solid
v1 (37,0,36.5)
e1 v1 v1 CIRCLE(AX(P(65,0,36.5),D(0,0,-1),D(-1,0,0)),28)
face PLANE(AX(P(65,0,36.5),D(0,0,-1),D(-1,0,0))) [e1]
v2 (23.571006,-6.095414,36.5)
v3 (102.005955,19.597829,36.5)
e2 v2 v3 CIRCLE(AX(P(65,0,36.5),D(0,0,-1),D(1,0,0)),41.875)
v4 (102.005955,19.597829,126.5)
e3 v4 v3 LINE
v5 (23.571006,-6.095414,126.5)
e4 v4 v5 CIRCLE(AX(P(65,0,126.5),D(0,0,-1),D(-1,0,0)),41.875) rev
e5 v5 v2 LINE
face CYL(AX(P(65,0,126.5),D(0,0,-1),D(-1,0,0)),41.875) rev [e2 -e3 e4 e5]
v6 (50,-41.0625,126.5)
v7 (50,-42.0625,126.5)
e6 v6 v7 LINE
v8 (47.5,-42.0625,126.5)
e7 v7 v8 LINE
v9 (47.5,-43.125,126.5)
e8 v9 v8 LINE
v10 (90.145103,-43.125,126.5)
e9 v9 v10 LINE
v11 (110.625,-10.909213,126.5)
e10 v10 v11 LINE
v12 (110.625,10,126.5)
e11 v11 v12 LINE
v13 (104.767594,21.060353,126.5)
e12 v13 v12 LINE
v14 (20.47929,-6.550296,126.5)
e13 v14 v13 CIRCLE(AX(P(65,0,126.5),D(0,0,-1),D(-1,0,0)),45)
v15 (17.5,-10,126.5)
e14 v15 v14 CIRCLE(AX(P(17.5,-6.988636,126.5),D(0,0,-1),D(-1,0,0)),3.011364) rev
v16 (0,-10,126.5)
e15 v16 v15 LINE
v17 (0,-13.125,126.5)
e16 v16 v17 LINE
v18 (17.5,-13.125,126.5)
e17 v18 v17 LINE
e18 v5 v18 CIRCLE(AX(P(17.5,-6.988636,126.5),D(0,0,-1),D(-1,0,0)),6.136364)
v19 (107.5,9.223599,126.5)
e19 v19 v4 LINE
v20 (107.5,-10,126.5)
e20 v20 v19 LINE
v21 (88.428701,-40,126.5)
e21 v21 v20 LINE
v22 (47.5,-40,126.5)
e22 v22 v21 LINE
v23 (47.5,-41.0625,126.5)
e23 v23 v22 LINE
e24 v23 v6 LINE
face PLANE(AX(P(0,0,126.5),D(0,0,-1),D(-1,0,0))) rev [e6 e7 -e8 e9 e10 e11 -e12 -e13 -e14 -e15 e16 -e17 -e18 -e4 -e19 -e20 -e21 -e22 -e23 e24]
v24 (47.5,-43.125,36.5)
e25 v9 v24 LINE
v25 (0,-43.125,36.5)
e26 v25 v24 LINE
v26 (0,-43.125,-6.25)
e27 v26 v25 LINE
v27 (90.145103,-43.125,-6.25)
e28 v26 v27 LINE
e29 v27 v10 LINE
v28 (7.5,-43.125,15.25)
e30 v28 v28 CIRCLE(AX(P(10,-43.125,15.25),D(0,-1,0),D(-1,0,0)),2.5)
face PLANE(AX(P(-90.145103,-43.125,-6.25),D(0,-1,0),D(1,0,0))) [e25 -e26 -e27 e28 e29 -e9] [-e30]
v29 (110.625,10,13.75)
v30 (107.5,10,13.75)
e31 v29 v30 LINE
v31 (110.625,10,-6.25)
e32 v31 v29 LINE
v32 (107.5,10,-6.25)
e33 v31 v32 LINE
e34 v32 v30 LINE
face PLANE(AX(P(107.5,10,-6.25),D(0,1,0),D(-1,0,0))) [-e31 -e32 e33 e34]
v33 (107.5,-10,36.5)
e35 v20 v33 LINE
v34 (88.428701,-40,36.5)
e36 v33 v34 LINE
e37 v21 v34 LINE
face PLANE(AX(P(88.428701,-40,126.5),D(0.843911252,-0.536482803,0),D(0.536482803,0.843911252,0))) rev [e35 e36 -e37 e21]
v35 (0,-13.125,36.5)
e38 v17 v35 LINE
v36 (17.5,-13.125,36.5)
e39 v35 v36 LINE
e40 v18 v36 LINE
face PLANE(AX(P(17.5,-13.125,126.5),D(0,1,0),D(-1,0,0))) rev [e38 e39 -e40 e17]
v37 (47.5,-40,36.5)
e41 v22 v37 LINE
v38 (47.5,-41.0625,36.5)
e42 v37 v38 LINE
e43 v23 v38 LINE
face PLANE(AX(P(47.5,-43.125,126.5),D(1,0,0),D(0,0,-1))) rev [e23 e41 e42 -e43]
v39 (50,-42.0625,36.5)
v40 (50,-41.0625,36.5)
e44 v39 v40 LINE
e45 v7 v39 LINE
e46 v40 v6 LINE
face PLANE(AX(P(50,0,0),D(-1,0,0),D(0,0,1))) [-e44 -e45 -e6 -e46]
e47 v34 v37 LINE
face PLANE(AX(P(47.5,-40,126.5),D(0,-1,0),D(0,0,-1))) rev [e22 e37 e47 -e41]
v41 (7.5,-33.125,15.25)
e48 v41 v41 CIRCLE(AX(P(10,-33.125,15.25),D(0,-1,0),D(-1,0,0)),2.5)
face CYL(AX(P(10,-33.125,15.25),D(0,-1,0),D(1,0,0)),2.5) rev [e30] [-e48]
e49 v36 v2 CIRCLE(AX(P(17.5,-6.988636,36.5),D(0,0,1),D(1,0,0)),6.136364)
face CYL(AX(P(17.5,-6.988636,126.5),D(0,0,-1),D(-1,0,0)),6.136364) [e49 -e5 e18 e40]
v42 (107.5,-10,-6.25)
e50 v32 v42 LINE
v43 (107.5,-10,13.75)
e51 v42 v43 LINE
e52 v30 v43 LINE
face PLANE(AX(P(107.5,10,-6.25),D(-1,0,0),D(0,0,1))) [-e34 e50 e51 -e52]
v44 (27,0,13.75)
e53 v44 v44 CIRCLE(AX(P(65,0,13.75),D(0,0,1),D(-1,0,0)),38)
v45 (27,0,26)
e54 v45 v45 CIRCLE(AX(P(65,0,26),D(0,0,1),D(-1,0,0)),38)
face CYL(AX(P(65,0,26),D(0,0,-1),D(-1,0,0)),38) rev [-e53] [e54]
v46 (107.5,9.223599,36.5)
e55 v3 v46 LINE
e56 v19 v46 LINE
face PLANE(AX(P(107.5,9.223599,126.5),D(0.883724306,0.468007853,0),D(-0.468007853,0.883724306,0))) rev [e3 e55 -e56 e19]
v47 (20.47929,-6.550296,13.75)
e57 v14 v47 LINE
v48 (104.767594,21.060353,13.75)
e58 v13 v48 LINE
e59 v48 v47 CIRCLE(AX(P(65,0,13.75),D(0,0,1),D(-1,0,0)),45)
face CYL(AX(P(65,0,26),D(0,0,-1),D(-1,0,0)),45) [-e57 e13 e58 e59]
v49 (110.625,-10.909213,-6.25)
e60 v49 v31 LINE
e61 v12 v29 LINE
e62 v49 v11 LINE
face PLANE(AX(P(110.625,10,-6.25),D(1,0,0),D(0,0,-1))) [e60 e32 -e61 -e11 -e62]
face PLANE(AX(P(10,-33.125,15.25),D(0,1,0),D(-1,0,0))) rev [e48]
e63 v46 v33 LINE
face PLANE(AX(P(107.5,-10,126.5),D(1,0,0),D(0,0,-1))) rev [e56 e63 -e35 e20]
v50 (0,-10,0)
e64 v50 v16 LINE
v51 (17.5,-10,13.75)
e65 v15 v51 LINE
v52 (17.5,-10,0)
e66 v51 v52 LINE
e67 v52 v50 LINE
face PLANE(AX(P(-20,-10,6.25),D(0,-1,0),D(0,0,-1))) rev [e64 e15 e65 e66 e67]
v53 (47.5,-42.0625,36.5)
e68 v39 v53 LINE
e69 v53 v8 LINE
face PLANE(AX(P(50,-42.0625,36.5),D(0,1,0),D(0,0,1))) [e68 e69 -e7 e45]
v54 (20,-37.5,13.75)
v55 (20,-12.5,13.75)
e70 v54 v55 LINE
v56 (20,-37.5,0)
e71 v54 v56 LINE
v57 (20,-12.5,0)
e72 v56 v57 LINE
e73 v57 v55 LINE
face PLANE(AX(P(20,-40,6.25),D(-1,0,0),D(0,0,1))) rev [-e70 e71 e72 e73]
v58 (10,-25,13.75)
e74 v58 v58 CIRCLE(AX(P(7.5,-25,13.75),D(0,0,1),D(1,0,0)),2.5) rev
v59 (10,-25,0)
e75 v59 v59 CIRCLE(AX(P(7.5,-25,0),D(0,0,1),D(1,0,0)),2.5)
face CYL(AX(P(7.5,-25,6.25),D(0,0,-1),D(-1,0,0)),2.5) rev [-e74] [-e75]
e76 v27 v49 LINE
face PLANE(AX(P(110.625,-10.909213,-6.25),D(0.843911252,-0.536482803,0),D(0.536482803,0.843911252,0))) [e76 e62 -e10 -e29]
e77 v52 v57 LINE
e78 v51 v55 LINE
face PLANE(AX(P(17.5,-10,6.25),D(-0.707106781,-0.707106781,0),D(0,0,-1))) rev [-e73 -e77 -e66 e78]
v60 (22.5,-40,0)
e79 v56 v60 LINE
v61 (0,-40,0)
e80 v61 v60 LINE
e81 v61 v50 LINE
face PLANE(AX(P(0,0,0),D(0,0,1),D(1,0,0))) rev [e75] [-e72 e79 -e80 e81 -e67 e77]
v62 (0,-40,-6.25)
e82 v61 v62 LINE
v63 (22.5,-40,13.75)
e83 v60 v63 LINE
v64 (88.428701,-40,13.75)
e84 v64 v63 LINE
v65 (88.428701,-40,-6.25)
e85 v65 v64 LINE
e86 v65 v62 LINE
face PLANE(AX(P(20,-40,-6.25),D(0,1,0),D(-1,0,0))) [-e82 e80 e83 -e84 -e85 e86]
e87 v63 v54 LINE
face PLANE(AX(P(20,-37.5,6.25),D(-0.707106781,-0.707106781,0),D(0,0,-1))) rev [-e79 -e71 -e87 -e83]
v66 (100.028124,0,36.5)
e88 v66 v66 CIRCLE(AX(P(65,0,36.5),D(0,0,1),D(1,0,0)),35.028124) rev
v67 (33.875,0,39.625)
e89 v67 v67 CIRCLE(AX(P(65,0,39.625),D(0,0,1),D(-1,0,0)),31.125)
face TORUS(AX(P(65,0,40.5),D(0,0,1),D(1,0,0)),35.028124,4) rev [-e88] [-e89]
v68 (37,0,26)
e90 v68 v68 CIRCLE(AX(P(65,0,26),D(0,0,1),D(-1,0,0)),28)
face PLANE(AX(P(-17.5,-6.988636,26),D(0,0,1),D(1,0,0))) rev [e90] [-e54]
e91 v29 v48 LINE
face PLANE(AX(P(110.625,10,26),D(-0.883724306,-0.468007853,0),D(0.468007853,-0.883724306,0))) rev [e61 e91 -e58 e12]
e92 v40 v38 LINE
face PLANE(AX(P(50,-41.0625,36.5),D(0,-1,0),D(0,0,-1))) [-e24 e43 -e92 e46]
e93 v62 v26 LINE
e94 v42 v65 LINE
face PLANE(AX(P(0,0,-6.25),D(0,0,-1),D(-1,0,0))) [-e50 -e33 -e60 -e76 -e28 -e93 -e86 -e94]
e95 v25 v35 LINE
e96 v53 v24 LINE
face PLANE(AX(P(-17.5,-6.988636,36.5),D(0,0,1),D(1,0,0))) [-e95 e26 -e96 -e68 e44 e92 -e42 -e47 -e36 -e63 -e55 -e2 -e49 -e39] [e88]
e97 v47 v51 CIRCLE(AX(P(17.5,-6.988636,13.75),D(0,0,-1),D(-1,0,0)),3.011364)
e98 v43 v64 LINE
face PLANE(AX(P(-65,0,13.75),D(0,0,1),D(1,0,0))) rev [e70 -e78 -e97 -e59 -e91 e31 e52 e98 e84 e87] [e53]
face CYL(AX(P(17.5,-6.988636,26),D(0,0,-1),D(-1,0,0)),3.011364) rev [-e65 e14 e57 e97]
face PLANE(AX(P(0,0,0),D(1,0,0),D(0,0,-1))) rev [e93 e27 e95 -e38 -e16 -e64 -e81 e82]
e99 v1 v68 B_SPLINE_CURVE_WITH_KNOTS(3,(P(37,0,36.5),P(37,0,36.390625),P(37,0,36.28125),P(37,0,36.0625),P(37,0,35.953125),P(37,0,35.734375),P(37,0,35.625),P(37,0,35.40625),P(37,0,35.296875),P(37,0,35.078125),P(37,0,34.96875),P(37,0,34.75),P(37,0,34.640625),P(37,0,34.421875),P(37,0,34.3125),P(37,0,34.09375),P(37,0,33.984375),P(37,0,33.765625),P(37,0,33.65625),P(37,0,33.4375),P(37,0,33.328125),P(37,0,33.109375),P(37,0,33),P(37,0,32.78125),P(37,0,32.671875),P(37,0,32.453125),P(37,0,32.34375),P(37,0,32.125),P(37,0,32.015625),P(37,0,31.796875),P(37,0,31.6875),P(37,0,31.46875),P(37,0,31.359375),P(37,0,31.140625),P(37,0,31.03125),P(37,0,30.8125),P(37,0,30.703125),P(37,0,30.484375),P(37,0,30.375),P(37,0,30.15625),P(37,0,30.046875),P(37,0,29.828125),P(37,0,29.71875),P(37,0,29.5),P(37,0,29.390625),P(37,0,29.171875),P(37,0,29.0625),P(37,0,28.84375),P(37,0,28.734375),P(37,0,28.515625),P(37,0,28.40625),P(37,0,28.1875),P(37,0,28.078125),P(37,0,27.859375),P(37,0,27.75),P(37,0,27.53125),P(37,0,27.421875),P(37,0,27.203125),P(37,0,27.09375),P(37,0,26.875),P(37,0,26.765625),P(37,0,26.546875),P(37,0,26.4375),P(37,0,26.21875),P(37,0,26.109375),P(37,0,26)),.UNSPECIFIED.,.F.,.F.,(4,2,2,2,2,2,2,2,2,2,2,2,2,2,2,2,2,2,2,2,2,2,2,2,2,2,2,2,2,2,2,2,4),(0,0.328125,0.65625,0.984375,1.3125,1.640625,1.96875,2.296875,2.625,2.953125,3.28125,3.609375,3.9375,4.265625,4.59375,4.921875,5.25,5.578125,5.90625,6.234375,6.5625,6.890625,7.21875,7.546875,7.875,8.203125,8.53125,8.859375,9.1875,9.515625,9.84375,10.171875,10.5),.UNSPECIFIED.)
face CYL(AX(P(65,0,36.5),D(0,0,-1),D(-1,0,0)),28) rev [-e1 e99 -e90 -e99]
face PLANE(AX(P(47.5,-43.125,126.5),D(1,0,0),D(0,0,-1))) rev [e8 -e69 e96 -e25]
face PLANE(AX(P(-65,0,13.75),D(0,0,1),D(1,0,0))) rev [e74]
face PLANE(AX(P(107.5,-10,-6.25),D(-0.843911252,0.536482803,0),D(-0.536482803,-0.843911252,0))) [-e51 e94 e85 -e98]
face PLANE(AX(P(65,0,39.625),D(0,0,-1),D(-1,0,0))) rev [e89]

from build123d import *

# Parameters (mm, degrees)
SKETCH3_W                = 40
SKETCH3_H                = 30
SKETCH3_R                = 2.5
BOSS_EXTRUDE2_DEPTH      = 6.25
SKETCH4_W                = 40
SKETCH4_H                = 6.25
BOSS_EXTRUDE3_DEPTH      = 7.5
BOSS_EXTRUDE4_DEPTH      = 20
CHAMFER1_SIZE            = 2.5
SKETCH6_R                = 38
BOSS_EXTRUDE5_DEPTH      = 12.25
SKETCH8_R                = 28
BOSS_EXTRUDE7_DEPTH      = 10.5
SKETCH9_R                = 31.125
BOSS_EXTRUDE8_DEPTH      = 3.125
FILLET1_R                = 4
BOSS_EXTRUDE9_DEPTH      = 90
CHAMFER1_OF_MIRROR1_SIZE = 2.5
FILLET1_OF_MIRROR1_R     = 4
SKETCH12_R               = 2.5
BOSS_EXTRUDE10_DEPTH     = 30
SKETCH14_R               = 2.5
CUT_EXTRUDE1_DEPTH       = 10
CUT_EXTRUDE2_DEPTH       = 50
SKETCH17_W               = 1
SKETCH17_H               = 6.235194638
BOSS_EXTRUDE11_DEPTH     = 5
FILLET2_R                = 0.5
FILLET3_R                = 0.5
SKETCH18_W               = 524.380672346
SKETCH18_H               = 94.959875778
CUT_EXTRUDE3_DEPTH       = 174
SKETCH19_W               = 272.949766815
SKETCH19_H               = 179.225609408
CUT_EXTRUDE4_DEPTH       = 174


with BuildPart() as part:
    # Sketch3 → Boss-Extrude2 (new body)
    with BuildSketch(Plane.XY):
        with Locations((0, -25)):
            Rectangle(SKETCH3_W, SKETCH3_H)
        with Locations((7.5, -25)):
            Circle(SKETCH3_R, mode=Mode.SUBTRACT)
        with Locations((-7.5, -25)):
            Circle(SKETCH3_R, mode=Mode.SUBTRACT)
    boss_extrude2 = extrude(amount=BOSS_EXTRUDE2_DEPTH)

    # Sketch4 → Boss-Extrude3 (add)
    with BuildSketch(Plane.XY.offset(6.25)):
        with Locations((0, -36.875)):
            Rectangle(SKETCH4_W, SKETCH4_H)
    boss_extrude3 = extrude(amount=BOSS_EXTRUDE3_DEPTH)

    # Sketch5 → Boss-Extrude4 (add)
    with BuildSketch(Plane.XY.offset(13.75)):
        Polygon((-20, -40), (-88.428700673, -40), (-107.5, -10), (-107.5, 10), (-110.625, 10), (-110.625, -10.909213368), (-90.145103003, -43.125), (90.145103003, -43.125), (110.625, -10.909213368), (110.625, 10), (107.5, 10), (107.5, -10), (88.428700673, -40), (20, -40), align=None)
    boss_extrude4 = extrude(amount=-BOSS_EXTRUDE4_DEPTH)

    # Chamfer1
    chamfer1_edges = [part.edges().sort_by_distance(p)[0] for p in [
        (-20, -40, 6.875),
        (-20, -10, 3.125),
        (20, -10, 3.125),
        (20, -40, 6.875),
    ]]
    chamfer(chamfer1_edges, length=CHAMFER1_SIZE)

    # Sketch6 → Boss-Extrude5 (add)
    with BuildSketch(Plane.XY.offset(13.75)):
        with BuildLine():
            Line((-110.625, 10), (-104.767593775, 21.060353399))
            ThreePointArc((-104.767593775, 21.060353399), (-50.991609061, 42.764061819), (-20.479289941, -6.550295858))
            ThreePointArc((-20.479289941, -6.550295858), (-19.779069285, -8.956923473), (-17.5, -10))
            Line((-17.5, -10), (17.5, -10))
            ThreePointArc((17.5, -10), (19.779069285, -8.956923473), (20.479289941, -6.550295858))
            ThreePointArc((20.479289941, -6.550295858), (50.991609061, 42.764061819), (104.767593775, 21.060353399))
            Line((104.767593775, 21.060353399), (110.625, 10))
            Line((110.625, 10), (110.625, -10.909213368))
            Line((110.625, -10.909213368), (90.145103003, -43.125))
            Line((90.145103003, -43.125), (-90.145103003, -43.125))
            Line((-90.145103003, -43.125), (-110.625, -10.909213368))
            Line((-110.625, -10.909213368), (-110.625, 10))
        make_face()
        with Locations((-65, 0)):
            Circle(SKETCH6_R, mode=Mode.SUBTRACT)
        with Locations(Location((65, 0, 0), (0, 0, 180))):
            Circle(SKETCH6_R, mode=Mode.SUBTRACT)
    boss_extrude5 = extrude(amount=BOSS_EXTRUDE5_DEPTH)

    # Sketch8 → Boss-Extrude7 (add)
    with BuildSketch(Plane.XY.offset(26)):
        with BuildLine():
            Line((-104.767593775, 21.060353399), (-110.625, 10))
            Line((-110.625, 10), (-110.625, -10.909213368))
            Line((-110.625, -10.909213368), (-90.145103003, -43.125))
            Line((-90.145103003, -43.125), (90.145103003, -43.125))
            Line((90.145103003, -43.125), (110.625, -10.909213368))
            Line((110.625, -10.909213368), (110.625, 10))
            Line((110.625, 10), (104.767593775, 21.060353399))
            ThreePointArc((104.767593775, 21.060353399), (50.991609061, 42.764061819), (20.479289941, -6.550295858))
            ThreePointArc((20.479289941, -6.550295858), (19.779069285, -8.956923473), (17.5, -10))
            Line((17.5, -10), (-17.5, -10))
            ThreePointArc((-17.5, -10), (-19.779069285, -8.956923473), (-20.479289941, -6.550295858))
            ThreePointArc((-20.479289941, -6.550295858), (-50.991609061, 42.764061819), (-104.767593775, 21.060353399))
        make_face()
        with Locations(Location((-65, 0, 0), (0, 0, 180))):
            Circle(SKETCH8_R, mode=Mode.SUBTRACT)
        with Locations(Location((65, 0, 0), (0, 0, 180))):
            Circle(SKETCH8_R, mode=Mode.SUBTRACT)
    boss_extrude7 = extrude(amount=BOSS_EXTRUDE7_DEPTH)

    # Sketch9 → Boss-Extrude8 (add)
    with BuildSketch(Plane.XY.offset(36.5)):
        with Locations(Location((65, 0, 0), (0, 0, 180))):
            Circle(SKETCH9_R)
        with Locations((-65, 0)):
            Circle(SKETCH9_R)
    boss_extrude8 = extrude(amount=BOSS_EXTRUDE8_DEPTH)

    # Fillet1
    # the kernel refuses this fillet: 4 mm, written as the material it adds along each edge
    with BuildSketch(Plane(origin=(-65, 0, 36.5), x_dir=(1, 0, 0), z_dir=(0, -1, 0))) as fillet1_piece_1:
        with BuildLine():
            CenterArc((35.028123749, 4), FILLET1_R, 192.635625093, 77.364374907)
            Line((31.125, 3.125), (31.046937525, 3.1075))
            ThreePointArc((31.046937525, 3.1075), (31.045, 1.5625), (31.045, 0))
            Line((31.045, 0), (31.125, -0.08))
            Line((31.125, -0.08), (35.028123749, -0.08))
            Line((35.028123749, -0.08), (35.028123749, 0))
        make_face()
    revolve(axis=Axis((-65, 0, 36.5), (0, 0, 1)))
    with BuildSketch(Plane(origin=(65, 0, 36.5), x_dir=(-1, 0, 0), z_dir=(0, 1, 0))) as fillet1_piece_2:
        with BuildLine():
            CenterArc((35.028123749, 4), FILLET1_R, 192.635625093, 77.364374907)
            Line((31.125, 3.125), (31.046937525, 3.1075))
            ThreePointArc((31.046937525, 3.1075), (31.045, 1.5625), (31.045, 0))
            Line((31.045, 0), (31.125, -0.08))
            Line((31.125, -0.08), (35.028123749, -0.08))
            Line((35.028123749, -0.08), (35.028123749, 0))
        make_face()
    revolve(axis=Axis((65, 0, 36.5), (0, 0, 1)))

    # Sketch10 → Boss-Extrude9 (add)
    with BuildSketch(Plane.XY.offset(36.5)):
        with BuildLine():
            Line((-104.767593775, 21.060353399), (-110.625, 10))
            Line((-110.625, 10), (-110.625, -10.909213368))
            Line((-110.625, -10.909213368), (-90.145103003, -43.125))
            Line((-90.145103003, -43.125), (-47.5, -43.125))
            Line((-47.5, -43.125), (-47.5, -40))
            Line((-47.5, -40), (-88.428700673, -40))
            Line((-88.428700673, -40), (-107.5, -10))
            Line((-107.5, -10), (-107.5, 9.223599474))
            Line((-107.5, 9.223599474), (-102.005955319, 19.597828858))
            ThreePointArc((-102.005955319, 19.597828858), (-51.964413987, 39.794335304), (-23.571005917, -6.095414201))
            ThreePointArc((-23.571005917, -6.095414201), (-22.144141184, -10.999485568), (-17.5, -13.125))
            Line((-17.5, -13.125), (17.5, -13.125))
            ThreePointArc((17.5, -13.125), (22.144141184, -10.999485568), (23.571005917, -6.095414201))
            ThreePointArc((23.571005917, -6.095414201), (51.964413987, 39.794335304), (102.005955319, 19.597828858))
            Line((102.005955319, 19.597828858), (107.5, 9.223599474))
            Line((107.5, 9.223599474), (107.5, -10))
            Line((107.5, -10), (88.428700673, -40))
            Line((88.428700673, -40), (47.5, -40))
            Line((47.5, -40), (47.5, -43.125))
            Line((47.5, -43.125), (90.145103003, -43.125))
            Line((90.145103003, -43.125), (110.625, -10.909213368))
            Line((110.625, -10.909213368), (110.625, 10))
            Line((110.625, 10), (104.767593775, 21.060353399))
            ThreePointArc((104.767593775, 21.060353399), (50.991609061, 42.764061819), (20.479289941, -6.550295858))
            ThreePointArc((20.479289941, -6.550295858), (19.779069285, -8.956923473), (17.5, -10))
            Line((17.5, -10), (-17.5, -10))
            ThreePointArc((-17.5, -10), (-19.779069285, -8.956923473), (-20.479289941, -6.550295858))
            ThreePointArc((-20.479289941, -6.550295858), (-50.991609061, 42.764061819), (-104.767593775, 21.060353399))
        make_face()
    boss_extrude9 = extrude(amount=BOSS_EXTRUDE9_DEPTH)

    # Mirror1: Boss-Extrude2, Boss-Extrude3, Boss-Extrude4, Boss-Extrude5, Boss-Extrude7, Boss-Extrude8, Boss-Extrude9 across plane
    add(boss_extrude2.mirror(Plane(origin=(-65, 0, 126.5), x_dir=(1, 0, 0), z_dir=(0, 0, 1))))
    add(boss_extrude3.mirror(Plane(origin=(-65, 0, 126.5), x_dir=(1, 0, 0), z_dir=(0, 0, 1))))
    add(boss_extrude4.mirror(Plane(origin=(-65, 0, 126.5), x_dir=(1, 0, 0), z_dir=(0, 0, 1))))
    add(boss_extrude5.mirror(Plane(origin=(-65, 0, 126.5), x_dir=(1, 0, 0), z_dir=(0, 0, 1))))
    add(boss_extrude7.mirror(Plane(origin=(-65, 0, 126.5), x_dir=(1, 0, 0), z_dir=(0, 0, 1))))
    add(boss_extrude8.mirror(Plane(origin=(-65, 0, 126.5), x_dir=(1, 0, 0), z_dir=(0, 0, 1))))
    add(boss_extrude9.mirror(Plane(origin=(-65, 0, 126.5), x_dir=(1, 0, 0), z_dir=(0, 0, 1))))

    # Chamfer1 of Mirror1
    chamfer1_of_mirror1_edges = [part.edges().sort_by_distance(p)[0] for p in [
        (-20, -40, 246.125),
        (-20, -10, 249.875),
        (20, -10, 249.875),
        (20, -40, 246.125),
    ]]
    chamfer(chamfer1_of_mirror1_edges, length=CHAMFER1_OF_MIRROR1_SIZE)

    # Fillet1 of Mirror1
    # the kernel refuses this fillet: 4 mm, written as the material it adds along each edge
    with BuildSketch(Plane(origin=(-65, 0, 216.5), x_dir=(1, 0, 0), z_dir=(0, -1, 0))) as fillet1_of_mirror1_piece_1:
        with BuildLine():
            CenterArc((35.028123749, -4), FILLET1_OF_MIRROR1_R, 90, 77.364374907)
            Line((31.125, -3.125), (31.046937525, -3.1075))
            ThreePointArc((31.046937525, -3.1075), (31.045, -1.5625), (31.045, 0))
            Line((31.045, 0), (31.125, 0.08))
            Line((31.125, 0.08), (35.028123749, 0.08))
            Line((35.028123749, 0.08), (35.028123749, 0))
        make_face()
    revolve(axis=Axis((-65, 0, 216.5), (0, 0, 1)))
    with BuildSketch(Plane(origin=(65, 0, 216.5), x_dir=(-1, 0, 0), z_dir=(0, 1, 0))) as fillet1_of_mirror1_piece_2:
        with BuildLine():
            CenterArc((35.028123749, -4), FILLET1_OF_MIRROR1_R, 90, 77.364374907)
            Line((31.125, -3.125), (31.046937525, -3.1075))
            ThreePointArc((31.046937525, -3.1075), (31.045, -1.5625), (31.045, 0))
            Line((31.045, 0), (31.125, 0.08))
            Line((31.125, 0.08), (35.028123749, 0.08))
            Line((35.028123749, 0.08), (35.028123749, 0))
        make_face()
    revolve(axis=Axis((65, 0, 216.5), (0, 0, 1)))

    # Sketch12 → Boss-Extrude10 (add)
    with BuildSketch(Plane.XY.offset(253)):
        Polygon((-20, -12.5), (-20, -37.5), (-22.5, -40), (22.5, -40), (20, -37.5), (20, -12.5), (17.5, -10), (-17.5, -10), align=None)
        with Locations((7.5, -25)):
            Circle(SKETCH12_R, mode=Mode.SUBTRACT)
        with Locations((-7.5, -25)):
            Circle(SKETCH12_R, mode=Mode.SUBTRACT)
    boss_extrude10 = extrude(amount=-BOSS_EXTRUDE10_DEPTH)

    # Mirror2: Boss-Extrude10 across plane
    add(boss_extrude10.mirror(Plane(origin=(0, 0, 126.5), x_dir=(1, 0, 0), z_dir=(0, 0, -1))))

    # Sketch14 → Cut-Extrude1 (cut)
    with BuildSketch(Plane.XZ.offset(43.125)):
        with Locations((10, 237.75)):
            Circle(SKETCH14_R)
        with Locations(Location((-10, 237.75, 0), (0, 0, 180))):
            Circle(SKETCH14_R)
        with Locations((-10, 15.25)):
            Circle(SKETCH14_R)
        with Locations(Location((10, 15.25, 0), (0, 0, 180))):
            Circle(SKETCH14_R)
    extrude(amount=-CUT_EXTRUDE1_DEPTH, mode=Mode.SUBTRACT)

    # Sketch16 → Cut-Extrude2 (cut, symmetric)
    with BuildSketch(Plane(origin=(0, 0, 0), x_dir=(0, 0, -1), z_dir=(1, 0, 0))):
        Polygon((-215.5, -41.0625), (-215.5, -40), (-216.5, -40), (-216.5, -41.0625), (-216.5, -42.0625), (-36.5, -42.0625), (-36.5, -41.0625), align=None)
    cut_extrude2 = extrude(amount=CUT_EXTRUDE2_DEPTH, both=True, mode=Mode.SUBTRACT)

    # Sketch17 → Boss-Extrude11 (add)
    with BuildSketch(Plane(origin=(-47.5, 0, 0), x_dir=(0, 0, -1), z_dir=(1, 0, 0))):
        with Locations((-215, -37.944902681)):
            Rectangle(SKETCH17_W, SKETCH17_H)
    boss_extrude11 = extrude(amount=-BOSS_EXTRUDE11_DEPTH)

    # Fillet2
    fillet2_edges = [part.edges().sort_by_distance(p)[0] for p in [
        (-48.75, -41.0625, 215.5),
        (-50, -40, 214.5),
    ]]
    fillet(fillet2_edges, radius=FILLET2_R)

    # Mirror3: Cut-Extrude2, Boss-Extrude11 across plane
    add(cut_extrude2.mirror(Plane(origin=(0, 0, 0), x_dir=(0, 0, 1), z_dir=(1, 0, 0))), mode=Mode.SUBTRACT)
    add(boss_extrude11.mirror(Plane(origin=(0, 0, 0), x_dir=(0, 0, 1), z_dir=(1, 0, 0))))

    # Fillet3
    fillet3_edges = [part.edges().sort_by_distance(p)[0] for p in [
        (48.75, -41.0625, 215.5),
        (50, -40, 214.5),
    ]]
    fillet(fillet3_edges, radius=FILLET3_R)

    # Sketch18 → Cut-Extrude3 (cut)
    with BuildSketch(Plane(origin=(0, 0, 126.5), x_dir=(-1, 0, 0), z_dir=(0, 0, -1))):
        Rectangle(SKETCH18_W, SKETCH18_H)
    extrude(amount=-CUT_EXTRUDE3_DEPTH, mode=Mode.SUBTRACT)

    # Sketch19 → Cut-Extrude4 (cut)
    with BuildSketch(Plane(origin=(0, 0, 0), x_dir=(0, 0, -1), z_dir=(1, 0, 0))):
        with Locations((-54.462141768, 10)):
            Rectangle(SKETCH19_W, SKETCH19_H)
    extrude(amount=-CUT_EXTRUDE4_DEPTH, mode=Mode.SUBTRACT)


solid = part.part
